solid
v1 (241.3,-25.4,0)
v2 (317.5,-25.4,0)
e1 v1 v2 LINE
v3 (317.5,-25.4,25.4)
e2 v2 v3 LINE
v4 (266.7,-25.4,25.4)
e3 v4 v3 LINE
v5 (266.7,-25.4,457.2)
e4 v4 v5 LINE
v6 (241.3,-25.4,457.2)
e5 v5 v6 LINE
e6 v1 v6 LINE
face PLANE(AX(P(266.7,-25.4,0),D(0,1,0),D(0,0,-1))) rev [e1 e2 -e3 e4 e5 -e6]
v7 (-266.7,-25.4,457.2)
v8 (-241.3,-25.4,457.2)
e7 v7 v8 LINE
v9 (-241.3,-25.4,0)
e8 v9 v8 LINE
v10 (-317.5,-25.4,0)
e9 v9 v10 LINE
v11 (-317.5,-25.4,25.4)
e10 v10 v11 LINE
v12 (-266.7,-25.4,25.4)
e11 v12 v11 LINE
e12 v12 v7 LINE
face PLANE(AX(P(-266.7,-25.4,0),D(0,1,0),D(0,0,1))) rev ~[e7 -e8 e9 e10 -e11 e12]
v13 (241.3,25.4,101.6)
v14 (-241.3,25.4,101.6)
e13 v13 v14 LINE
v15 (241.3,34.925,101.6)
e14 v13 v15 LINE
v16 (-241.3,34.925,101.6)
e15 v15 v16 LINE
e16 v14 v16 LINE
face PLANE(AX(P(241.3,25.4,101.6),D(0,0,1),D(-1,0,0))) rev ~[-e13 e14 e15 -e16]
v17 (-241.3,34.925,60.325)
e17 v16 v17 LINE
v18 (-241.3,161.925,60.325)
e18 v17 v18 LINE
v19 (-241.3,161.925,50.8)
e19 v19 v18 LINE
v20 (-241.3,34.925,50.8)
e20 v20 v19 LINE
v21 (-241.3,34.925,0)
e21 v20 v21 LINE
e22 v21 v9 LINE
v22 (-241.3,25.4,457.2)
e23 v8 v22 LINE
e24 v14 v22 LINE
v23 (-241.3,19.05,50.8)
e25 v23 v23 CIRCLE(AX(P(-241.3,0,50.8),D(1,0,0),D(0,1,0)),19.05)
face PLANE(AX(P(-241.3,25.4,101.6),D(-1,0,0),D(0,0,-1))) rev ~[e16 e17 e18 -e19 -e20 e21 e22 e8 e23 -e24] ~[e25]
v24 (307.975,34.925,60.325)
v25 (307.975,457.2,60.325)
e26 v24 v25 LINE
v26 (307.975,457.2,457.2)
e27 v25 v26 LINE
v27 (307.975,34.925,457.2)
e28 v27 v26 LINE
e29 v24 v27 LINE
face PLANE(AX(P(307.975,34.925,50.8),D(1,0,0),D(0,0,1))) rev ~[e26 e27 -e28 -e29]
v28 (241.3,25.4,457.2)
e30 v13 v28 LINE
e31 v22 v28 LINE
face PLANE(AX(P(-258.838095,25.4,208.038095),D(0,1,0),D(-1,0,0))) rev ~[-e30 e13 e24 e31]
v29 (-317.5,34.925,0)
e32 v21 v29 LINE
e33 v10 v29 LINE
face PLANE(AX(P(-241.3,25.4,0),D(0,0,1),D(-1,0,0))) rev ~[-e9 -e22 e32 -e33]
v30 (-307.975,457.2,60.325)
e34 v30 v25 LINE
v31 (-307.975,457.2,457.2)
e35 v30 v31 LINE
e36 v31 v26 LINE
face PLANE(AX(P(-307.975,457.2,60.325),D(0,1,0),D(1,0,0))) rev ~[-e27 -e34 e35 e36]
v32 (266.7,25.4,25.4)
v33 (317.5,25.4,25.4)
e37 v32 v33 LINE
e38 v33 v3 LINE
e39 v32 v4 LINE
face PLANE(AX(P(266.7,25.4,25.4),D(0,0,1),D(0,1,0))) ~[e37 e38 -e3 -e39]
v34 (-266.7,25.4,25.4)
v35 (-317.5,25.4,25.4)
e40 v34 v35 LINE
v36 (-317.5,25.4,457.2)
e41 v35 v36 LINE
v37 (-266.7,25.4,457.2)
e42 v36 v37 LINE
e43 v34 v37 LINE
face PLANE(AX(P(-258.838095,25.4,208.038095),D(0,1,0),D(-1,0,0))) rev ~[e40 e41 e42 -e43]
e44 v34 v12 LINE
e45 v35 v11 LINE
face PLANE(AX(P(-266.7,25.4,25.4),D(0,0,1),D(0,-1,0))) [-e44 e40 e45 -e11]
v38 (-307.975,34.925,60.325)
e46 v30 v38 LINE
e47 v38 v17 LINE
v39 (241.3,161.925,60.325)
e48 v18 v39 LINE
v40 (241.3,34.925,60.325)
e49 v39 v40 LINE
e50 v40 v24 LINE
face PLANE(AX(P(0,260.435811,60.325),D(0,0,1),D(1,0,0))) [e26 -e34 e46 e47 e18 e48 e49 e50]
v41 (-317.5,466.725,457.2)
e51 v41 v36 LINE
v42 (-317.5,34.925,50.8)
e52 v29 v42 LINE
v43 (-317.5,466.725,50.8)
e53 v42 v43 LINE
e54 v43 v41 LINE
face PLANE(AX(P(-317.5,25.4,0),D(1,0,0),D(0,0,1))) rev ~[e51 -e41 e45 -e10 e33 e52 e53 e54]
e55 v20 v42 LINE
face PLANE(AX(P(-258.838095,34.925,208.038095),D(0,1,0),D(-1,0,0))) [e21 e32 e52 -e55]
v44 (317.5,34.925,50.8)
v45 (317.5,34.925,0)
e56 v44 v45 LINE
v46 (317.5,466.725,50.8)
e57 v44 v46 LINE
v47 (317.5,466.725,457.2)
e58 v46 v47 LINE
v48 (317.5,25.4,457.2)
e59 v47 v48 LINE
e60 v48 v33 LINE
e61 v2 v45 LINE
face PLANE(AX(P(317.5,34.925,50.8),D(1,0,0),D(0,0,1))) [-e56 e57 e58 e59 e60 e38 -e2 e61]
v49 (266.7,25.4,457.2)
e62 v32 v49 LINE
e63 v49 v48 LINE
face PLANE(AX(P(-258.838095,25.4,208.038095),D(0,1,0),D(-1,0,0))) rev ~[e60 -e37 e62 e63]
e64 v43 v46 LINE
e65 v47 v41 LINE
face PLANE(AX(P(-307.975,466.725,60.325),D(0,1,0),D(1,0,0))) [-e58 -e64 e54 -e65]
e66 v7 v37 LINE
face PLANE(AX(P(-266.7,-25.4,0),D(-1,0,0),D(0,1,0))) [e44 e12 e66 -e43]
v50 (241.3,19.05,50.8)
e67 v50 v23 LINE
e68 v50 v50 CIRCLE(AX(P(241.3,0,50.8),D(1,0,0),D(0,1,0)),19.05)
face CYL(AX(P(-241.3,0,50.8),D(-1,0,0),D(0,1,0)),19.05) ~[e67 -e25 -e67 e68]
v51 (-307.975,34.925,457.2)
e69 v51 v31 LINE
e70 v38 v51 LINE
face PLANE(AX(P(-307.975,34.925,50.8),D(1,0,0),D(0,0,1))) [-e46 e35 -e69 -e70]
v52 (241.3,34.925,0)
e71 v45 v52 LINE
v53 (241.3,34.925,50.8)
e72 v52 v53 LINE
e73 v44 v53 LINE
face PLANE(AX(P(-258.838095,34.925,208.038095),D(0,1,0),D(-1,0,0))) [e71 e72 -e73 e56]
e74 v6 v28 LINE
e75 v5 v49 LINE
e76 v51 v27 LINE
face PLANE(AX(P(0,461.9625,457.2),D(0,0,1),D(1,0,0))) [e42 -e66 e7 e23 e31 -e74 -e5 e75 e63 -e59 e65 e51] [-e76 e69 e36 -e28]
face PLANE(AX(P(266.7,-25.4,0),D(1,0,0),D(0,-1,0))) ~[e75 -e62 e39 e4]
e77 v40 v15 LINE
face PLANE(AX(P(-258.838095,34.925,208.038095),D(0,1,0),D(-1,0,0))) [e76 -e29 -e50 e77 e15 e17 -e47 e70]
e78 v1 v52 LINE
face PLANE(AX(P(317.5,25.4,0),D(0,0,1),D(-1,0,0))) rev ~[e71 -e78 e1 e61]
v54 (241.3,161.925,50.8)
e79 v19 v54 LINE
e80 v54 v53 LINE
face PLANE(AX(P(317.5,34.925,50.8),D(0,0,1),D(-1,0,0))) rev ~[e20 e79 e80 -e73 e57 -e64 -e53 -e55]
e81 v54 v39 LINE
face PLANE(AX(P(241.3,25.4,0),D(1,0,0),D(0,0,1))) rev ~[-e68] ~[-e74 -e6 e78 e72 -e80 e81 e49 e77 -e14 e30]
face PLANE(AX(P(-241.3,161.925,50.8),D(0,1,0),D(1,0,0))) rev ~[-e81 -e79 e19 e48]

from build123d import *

# Parameters (mm, degrees)
F0_W      = 25.4
F0_H      = 50.8
F1_DEPTH  = 457.2
F2_W      = 50.8
F2_H      = 25.4
F3_DEPTH  = 50.8
F4_R      = 19.05
F5_DEPTH  = 241.3
F7_W      = 50.8
F7_H      = 431.8
F8_DEPTH  = 9.525
F11_DEPTH = 9.525
F12_W     = 9.525
F12_H     = 406.4
F13_DEPTH = 431.8
F14_W     = 615.95
F14_H     = 9.525
F15_DEPTH = 396.875


# Not quite as in the source:
# - a feature names something its author has since deleted; it is built from what else it names


with BuildPart() as f1:
    # F0 (on Top) → F1 (new body)
    with BuildSketch(Plane.XY):
        with Locations((-254, 0)):
            Rectangle(F0_W, F0_H)
    extrude(amount=F1_DEPTH)

    # F2 (on face) → F3 (join)
    with BuildSketch(Plane(origin=(-266.7, 0, 0), x_dir=(0, -1, 0), z_dir=(-1, 0, 0))):
        with Locations((0, 12.7)):
            Rectangle(F2_W, F2_H)
    extrude(amount=F3_DEPTH)

    # F4 (on face) → F5 (join)
    with BuildSketch(Plane.YZ.offset(-241.3)):
        with Locations((0, 50.8)):
            Circle(F4_R)
    extrude(amount=F5_DEPTH)

    # F6: F1 across plane


with BuildPart() as f1_1:
    add(f1.part)
    add(f1.part.mirror(Plane.YZ))

    # F7 (on face) → F8 (join)
    with BuildSketch(Plane(origin=(0, 25.4, 0), x_dir=(-1, 0, 0), z_dir=(0, 1, 0))):
        Polygon((241.3, 0), (317.5, 0), (317.5, 25.4), (266.7, 25.4), (266.7, 457.2), (241.3, 457.2), (241.3, 101.6), align=None)
        with Locations((292.1, 241.3)):
            Rectangle(F7_W, F7_H)
        Polygon((0, 101.6), (241.3, 101.6), (241.3, 457.2), (0, 457.2), (-241.3, 457.2), (-241.3, 101.6), align=None)
        Polygon((-241.3, 0), (-241.3, 101.6), (-241.3, 457.2), (-317.5, 457.2), (-317.5, 0), align=None)
    extrude(amount=F8_DEPTH)

    # F10 (on offset) → F11 (join)
    with BuildSketch(Plane.XY.offset(50.8)):
        Polygon((-307.975, 34.925), (-241.3, 34.925), (-241.3, 161.925), (241.3, 161.925), (241.3, 34.925), (307.975, 34.925), (307.975, 466.725), (-307.975, 466.725), align=None)
    extrude(amount=F11_DEPTH)

    # F12 (on face) → F13 (join)
    with BuildSketch(Plane(origin=(0, 34.925, 0), x_dir=(-1, 0, 0), z_dir=(0, 1, 0))):
        with Locations((-312.7375, 254)):
            Rectangle(F12_W, F12_H)
        with Locations((312.7375, 254)):
            Rectangle(F12_W, F12_H)
    extrude(amount=F13_DEPTH)

    # F14 (on face) → F15 (join, through all)
    with BuildSketch(Plane.XY.offset(60.325)):
        with Locations((0, 461.9625)):
            Rectangle(F14_W, F14_H)
    extrude(amount=F15_DEPTH)


solid = f1_1.part
